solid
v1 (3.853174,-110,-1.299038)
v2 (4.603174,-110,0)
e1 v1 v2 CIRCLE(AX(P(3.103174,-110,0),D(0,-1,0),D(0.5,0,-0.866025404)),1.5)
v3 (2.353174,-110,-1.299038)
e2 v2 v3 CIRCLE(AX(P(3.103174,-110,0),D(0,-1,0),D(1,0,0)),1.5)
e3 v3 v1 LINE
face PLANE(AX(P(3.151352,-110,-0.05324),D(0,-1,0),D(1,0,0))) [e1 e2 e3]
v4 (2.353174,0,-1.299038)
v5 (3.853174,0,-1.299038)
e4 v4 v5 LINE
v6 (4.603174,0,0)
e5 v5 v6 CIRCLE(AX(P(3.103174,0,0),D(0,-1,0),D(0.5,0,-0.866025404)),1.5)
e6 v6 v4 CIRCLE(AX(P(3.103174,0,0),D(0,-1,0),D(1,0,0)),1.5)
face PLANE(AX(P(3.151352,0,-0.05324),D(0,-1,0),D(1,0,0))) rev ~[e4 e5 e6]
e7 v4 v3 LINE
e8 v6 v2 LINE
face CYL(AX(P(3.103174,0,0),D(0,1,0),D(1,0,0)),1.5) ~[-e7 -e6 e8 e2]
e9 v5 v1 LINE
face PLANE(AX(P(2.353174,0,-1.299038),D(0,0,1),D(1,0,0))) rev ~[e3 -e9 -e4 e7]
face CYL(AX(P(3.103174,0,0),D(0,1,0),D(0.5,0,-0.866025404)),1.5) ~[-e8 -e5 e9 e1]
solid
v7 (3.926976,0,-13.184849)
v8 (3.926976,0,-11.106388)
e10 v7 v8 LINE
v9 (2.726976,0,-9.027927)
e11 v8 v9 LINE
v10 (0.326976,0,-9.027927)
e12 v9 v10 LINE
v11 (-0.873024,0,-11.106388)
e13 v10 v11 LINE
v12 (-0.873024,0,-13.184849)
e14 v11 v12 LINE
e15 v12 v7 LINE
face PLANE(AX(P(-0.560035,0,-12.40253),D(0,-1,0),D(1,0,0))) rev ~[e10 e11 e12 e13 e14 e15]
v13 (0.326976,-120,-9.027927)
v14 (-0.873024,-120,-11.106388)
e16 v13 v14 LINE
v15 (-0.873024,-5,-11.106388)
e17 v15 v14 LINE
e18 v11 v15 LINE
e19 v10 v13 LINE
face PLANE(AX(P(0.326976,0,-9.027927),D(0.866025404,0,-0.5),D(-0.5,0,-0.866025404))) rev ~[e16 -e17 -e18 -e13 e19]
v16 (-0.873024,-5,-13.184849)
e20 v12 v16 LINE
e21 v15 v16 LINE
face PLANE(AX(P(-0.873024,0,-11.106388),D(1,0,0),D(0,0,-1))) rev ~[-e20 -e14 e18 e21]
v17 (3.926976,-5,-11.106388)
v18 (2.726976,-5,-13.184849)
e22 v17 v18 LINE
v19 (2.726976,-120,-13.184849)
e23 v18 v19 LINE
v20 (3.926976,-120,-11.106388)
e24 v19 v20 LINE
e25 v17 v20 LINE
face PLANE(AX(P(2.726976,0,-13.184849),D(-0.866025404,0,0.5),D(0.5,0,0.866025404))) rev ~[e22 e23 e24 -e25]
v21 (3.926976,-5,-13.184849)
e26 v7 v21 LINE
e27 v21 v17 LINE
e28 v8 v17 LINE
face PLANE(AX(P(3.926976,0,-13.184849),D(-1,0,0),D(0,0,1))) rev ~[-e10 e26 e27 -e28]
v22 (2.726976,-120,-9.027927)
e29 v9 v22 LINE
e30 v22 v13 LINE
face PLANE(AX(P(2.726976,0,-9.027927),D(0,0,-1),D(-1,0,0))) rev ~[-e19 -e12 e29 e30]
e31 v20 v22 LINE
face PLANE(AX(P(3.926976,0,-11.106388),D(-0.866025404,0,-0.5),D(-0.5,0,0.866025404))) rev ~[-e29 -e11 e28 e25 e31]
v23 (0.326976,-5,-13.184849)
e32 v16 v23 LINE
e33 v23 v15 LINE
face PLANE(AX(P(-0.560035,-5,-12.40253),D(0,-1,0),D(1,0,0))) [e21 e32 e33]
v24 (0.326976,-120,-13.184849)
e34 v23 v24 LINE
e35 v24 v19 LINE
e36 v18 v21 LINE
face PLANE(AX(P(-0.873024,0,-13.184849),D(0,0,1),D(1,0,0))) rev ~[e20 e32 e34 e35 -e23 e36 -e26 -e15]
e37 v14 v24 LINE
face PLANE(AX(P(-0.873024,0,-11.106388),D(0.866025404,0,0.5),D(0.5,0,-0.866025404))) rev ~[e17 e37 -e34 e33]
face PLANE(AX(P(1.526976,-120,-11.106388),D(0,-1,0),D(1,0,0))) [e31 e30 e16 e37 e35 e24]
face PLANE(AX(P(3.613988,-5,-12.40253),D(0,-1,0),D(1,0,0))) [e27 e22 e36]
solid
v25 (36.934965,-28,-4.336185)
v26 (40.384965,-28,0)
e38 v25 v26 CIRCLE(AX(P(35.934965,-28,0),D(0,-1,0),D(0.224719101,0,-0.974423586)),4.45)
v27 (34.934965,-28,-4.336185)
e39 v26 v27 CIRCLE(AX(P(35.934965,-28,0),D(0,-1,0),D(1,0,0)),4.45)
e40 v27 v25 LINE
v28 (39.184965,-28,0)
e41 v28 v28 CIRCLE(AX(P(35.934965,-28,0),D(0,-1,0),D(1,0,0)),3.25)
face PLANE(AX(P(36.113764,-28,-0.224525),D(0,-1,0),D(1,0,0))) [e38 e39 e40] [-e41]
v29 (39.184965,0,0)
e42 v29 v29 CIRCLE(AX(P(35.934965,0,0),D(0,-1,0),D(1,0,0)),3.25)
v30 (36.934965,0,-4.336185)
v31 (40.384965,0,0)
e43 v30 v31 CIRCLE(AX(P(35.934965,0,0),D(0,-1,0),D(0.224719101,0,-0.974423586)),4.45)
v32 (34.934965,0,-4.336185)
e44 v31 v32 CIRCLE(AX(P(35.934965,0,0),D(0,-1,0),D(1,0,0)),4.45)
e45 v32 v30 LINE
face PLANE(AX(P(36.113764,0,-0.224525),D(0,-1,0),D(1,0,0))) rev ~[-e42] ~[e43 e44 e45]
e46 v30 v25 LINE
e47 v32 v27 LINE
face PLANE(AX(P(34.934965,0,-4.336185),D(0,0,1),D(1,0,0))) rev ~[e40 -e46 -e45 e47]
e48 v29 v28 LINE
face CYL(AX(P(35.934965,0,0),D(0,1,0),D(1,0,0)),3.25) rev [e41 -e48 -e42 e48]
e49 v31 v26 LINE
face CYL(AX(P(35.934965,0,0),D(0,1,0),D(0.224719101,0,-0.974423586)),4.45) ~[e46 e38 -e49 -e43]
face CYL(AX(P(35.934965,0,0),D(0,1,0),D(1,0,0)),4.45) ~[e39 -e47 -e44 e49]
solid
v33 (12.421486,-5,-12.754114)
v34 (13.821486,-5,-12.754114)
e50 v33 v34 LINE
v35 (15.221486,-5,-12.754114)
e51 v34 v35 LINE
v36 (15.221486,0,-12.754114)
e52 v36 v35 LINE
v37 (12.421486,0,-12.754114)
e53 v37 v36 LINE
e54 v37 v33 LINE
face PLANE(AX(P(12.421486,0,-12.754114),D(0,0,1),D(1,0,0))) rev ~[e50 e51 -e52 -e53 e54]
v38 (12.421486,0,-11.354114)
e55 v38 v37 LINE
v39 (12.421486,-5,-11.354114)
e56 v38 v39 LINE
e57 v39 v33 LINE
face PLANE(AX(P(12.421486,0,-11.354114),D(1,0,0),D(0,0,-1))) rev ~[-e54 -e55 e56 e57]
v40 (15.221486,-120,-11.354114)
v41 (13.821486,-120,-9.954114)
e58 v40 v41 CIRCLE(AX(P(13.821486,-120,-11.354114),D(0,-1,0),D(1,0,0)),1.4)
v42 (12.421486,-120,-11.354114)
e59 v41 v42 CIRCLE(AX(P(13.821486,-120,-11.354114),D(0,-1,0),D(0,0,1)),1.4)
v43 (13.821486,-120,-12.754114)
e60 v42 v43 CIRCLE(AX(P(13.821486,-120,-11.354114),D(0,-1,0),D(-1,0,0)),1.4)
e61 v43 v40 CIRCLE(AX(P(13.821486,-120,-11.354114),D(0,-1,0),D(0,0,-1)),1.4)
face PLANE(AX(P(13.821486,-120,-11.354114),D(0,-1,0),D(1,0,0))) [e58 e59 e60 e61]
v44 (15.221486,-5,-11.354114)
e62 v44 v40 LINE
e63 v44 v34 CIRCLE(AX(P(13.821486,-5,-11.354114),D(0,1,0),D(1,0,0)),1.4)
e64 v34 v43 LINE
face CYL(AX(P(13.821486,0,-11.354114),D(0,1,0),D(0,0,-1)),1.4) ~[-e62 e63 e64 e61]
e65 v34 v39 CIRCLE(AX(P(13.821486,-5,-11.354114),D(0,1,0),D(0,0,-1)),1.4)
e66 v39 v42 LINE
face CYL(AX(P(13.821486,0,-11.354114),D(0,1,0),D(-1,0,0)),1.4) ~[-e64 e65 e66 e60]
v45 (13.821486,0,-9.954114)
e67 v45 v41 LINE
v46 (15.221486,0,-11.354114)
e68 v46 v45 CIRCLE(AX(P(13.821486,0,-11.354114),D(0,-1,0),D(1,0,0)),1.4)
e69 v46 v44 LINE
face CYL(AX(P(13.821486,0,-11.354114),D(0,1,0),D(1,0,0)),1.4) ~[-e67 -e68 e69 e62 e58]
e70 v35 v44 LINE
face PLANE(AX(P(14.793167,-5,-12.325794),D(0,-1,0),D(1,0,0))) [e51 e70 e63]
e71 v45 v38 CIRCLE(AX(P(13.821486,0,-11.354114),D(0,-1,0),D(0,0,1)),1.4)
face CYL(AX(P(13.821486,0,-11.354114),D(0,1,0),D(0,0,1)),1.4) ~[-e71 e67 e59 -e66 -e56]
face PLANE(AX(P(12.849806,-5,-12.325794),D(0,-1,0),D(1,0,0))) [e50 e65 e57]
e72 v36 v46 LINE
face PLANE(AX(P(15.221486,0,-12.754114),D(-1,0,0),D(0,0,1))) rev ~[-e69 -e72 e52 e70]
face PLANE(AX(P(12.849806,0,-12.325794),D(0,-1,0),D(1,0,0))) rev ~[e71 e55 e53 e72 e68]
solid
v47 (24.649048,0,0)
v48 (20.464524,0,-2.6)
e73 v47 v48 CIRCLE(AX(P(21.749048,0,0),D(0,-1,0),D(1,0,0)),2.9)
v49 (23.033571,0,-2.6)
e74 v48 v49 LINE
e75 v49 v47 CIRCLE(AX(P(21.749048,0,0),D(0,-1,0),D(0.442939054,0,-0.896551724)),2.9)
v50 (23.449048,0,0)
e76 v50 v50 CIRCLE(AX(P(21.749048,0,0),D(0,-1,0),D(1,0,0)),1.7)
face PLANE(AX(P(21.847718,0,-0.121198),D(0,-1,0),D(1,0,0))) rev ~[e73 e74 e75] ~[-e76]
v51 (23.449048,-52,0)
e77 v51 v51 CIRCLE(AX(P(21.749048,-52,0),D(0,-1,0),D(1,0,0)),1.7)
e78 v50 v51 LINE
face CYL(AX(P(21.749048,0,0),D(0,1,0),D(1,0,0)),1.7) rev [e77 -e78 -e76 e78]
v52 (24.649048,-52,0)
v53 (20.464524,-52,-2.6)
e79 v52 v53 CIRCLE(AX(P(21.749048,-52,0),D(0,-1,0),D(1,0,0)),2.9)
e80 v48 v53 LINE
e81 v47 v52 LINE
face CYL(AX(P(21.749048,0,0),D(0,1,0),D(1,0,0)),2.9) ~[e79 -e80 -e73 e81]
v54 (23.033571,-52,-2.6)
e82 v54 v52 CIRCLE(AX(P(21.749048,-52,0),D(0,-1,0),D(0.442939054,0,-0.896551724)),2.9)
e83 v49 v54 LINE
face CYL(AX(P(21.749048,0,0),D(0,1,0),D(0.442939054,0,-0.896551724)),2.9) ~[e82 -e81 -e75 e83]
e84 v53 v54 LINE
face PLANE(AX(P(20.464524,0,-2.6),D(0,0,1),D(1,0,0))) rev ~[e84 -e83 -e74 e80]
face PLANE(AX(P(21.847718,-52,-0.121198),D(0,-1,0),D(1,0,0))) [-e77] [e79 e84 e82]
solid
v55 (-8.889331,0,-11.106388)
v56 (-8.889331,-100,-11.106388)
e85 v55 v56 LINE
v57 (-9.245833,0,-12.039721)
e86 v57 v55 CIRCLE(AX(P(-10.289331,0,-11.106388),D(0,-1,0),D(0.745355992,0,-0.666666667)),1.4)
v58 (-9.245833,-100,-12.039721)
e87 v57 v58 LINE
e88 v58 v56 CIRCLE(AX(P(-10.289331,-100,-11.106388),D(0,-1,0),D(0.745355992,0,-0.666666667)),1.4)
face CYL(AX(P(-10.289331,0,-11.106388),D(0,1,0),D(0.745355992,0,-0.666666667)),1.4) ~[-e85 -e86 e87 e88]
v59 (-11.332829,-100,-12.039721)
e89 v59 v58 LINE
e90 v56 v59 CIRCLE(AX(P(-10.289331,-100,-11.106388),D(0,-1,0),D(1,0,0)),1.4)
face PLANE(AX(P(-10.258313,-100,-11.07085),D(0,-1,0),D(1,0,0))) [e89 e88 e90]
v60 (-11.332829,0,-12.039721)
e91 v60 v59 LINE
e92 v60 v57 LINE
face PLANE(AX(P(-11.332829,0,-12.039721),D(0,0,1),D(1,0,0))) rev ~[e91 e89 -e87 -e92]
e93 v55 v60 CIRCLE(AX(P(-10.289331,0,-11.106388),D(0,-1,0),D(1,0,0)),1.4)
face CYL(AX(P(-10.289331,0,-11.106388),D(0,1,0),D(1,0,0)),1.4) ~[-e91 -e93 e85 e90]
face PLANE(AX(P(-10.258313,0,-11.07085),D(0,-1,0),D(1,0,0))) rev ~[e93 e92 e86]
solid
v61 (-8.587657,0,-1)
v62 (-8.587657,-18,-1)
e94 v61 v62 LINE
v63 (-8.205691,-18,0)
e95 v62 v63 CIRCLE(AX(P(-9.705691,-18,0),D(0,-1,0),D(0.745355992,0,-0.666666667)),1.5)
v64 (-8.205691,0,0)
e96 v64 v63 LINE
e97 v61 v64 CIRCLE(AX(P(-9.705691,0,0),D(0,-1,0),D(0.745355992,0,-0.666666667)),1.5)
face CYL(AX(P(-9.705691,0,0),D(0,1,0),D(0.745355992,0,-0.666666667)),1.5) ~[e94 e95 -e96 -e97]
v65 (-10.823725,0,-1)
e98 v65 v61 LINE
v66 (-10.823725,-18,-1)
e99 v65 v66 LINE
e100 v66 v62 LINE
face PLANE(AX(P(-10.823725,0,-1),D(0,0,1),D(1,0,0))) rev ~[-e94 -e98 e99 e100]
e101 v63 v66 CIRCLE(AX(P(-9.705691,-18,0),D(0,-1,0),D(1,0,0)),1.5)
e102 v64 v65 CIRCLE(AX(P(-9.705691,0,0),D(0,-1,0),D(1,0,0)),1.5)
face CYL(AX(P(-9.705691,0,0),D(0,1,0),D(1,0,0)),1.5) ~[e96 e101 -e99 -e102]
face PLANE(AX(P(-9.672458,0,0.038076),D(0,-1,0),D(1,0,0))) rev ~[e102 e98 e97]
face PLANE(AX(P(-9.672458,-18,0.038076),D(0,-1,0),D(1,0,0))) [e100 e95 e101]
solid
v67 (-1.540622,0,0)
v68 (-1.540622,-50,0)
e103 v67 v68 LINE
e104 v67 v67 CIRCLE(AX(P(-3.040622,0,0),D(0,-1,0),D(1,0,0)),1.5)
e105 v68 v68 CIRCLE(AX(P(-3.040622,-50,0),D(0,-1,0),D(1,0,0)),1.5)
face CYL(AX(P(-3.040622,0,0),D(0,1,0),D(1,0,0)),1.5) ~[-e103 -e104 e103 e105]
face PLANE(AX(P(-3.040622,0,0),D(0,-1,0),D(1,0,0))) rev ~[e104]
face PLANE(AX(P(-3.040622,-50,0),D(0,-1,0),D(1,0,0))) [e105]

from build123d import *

# Parameters (mm, degrees)
F1_DEPTH = 18
F0_R     = 1.5
F2_DEPTH = 50
F3_DEPTH = 110
F4_DEPTH = 100
F0_R_2   = 1.7
F5_DEPTH = 52
F0_R_3   = 3.25
F6_DEPTH = 28
F7_DEPTH = 120
F8_DEPTH = 5
F9_DEPTH = 5


# Not quite as in the source:
# - a feature names something its author has since deleted; it is built from what else it names


with BuildPart() as f1:
    # F0 (on Front) → F1 (new body)
    with BuildSketch(Plane.XZ):
        with BuildLine():
            ThreePointArc((-8.5876567433, -1), (-8.3044321936, -0.5352331347), (-8.205690732, 0))
            ThreePointArc((-8.205690732, 0), (-10.2409238667, 1.4012585384), (-10.8237247208, -1))
            Line((-10.8237247208, -1), (-8.5876567433, -1))
        make_face()
    extrude(amount=F1_DEPTH)


with BuildPart() as f2:
    # F0 (on Front) → F2 (new body)
    with BuildSketch(Plane.XZ):
        with Locations((-3.0406215228, 0)):
            Circle(F0_R)
    extrude(amount=F2_DEPTH)


with BuildPart() as f3:
    # F0 (on Front) → F3 (new body)
    with BuildSketch(Plane.XZ):
        with BuildLine():
            ThreePointArc((4.6031738035, 0), (2.3531738035, 1.2990381057), (2.3531738035, -1.2990381057))
            Line((2.3531738035, -1.2990381057), (3.8531738035, -1.2990381057))
            ThreePointArc((3.8531738035, -1.2990381057), (4.4022119092, -0.75), (4.6031738035, 0))
        make_face()
    extrude(amount=F3_DEPTH)


with BuildPart() as f4:
    # F0 (on Front) → F4 (new body)
    with BuildSketch(Plane.XZ):
        with BuildLine():
            ThreePointArc((-9.2458325086, -12.0397212359), (-8.9814895955, -11.6059388283), (-8.8893308981, -11.1063879026))
            ThreePointArc((-8.8893308981, -11.1063879026), (-10.7888818238, -9.7985466), (-11.3328292876, -12.0397212359))
            Line((-11.3328292876, -12.0397212359), (-9.2458325086, -12.0397212359))
        make_face()
    extrude(amount=F4_DEPTH)


with BuildPart() as f5:
    # F0 (on Front) → F5 (new body)
    with BuildSketch(Plane.XZ):
        with BuildLine():
            ThreePointArc((23.0335708203, -2.6), (24.2122890699, -1.5305036021), (24.6490475625, 0))
            ThreePointArc((24.6490475625, 0), (20.2185439604, 2.4632415074), (20.4645243046, -2.6))
            Line((20.4645243046, -2.6), (23.0335708203, -2.6))
        make_face()
        with Locations((21.7490475625, 0)):
            Circle(F0_R_2, mode=Mode.SUBTRACT)
    extrude(amount=F5_DEPTH)


with BuildPart() as f6:
    # F0 (on Front) → F6 (new body)
    with BuildSketch(Plane.XZ):
        with BuildLine():
            ThreePointArc((36.9349649165, -4.3361849592), (39.4172414707, -2.7706046272), (40.3849649165, 0))
            ThreePointArc((40.3849649165, 0), (33.1643602893, 3.4822765542), (34.9349649165, -4.3361849592))
            Line((34.9349649165, -4.3361849592), (36.9349649165, -4.3361849592))
        make_face()
        with Locations((35.9349649165, 0)):
            Circle(F0_R_3, mode=Mode.SUBTRACT)
    extrude(amount=F6_DEPTH)


with BuildPart() as f7:
    # F0 (on Front) → F7 (new body)
    with BuildSketch(Plane.XZ):
        with BuildLine():
            ThreePointArc((13.8214863837, -12.754113929), (14.8114358773, -12.3440634226), (15.2214863837, -11.354113929))
            ThreePointArc((15.2214863837, -11.354113929), (14.8114358773, -10.3641644353), (13.8214863837, -9.954113929))
            ThreePointArc((13.8214863837, -9.954113929), (12.83153689, -10.3641644353), (12.4214863837, -11.354113929))
            ThreePointArc((12.4214863837, -11.354113929), (12.83153689, -12.3440634226), (13.8214863837, -12.754113929))
        make_face()
    extrude(amount=F7_DEPTH)

    # F0 (on Front) → F9 (join)
    with BuildSketch(Plane.XZ):
        with BuildLine():
            Line((12.4214863837, -12.754113929), (13.8214863837, -12.754113929))
            ThreePointArc((13.8214863837, -12.754113929), (12.83153689, -12.3440634226), (12.4214863837, -11.354113929))
            Line((12.4214863837, -11.354113929), (12.4214863837, -12.754113929))
        make_face()
        with BuildLine():
            Line((15.2214863837, -12.754113929), (15.2214863837, -11.354113929))
            ThreePointArc((15.2214863837, -11.354113929), (14.8114358773, -12.3440634226), (13.8214863837, -12.754113929))
            Line((13.8214863837, -12.754113929), (15.2214863837, -12.754113929))
        make_face()
    extrude(amount=F9_DEPTH)


with BuildPart() as f7b:
    # F0 (on Front) → F7, piece 2 (new body)
    with BuildSketch(Plane.XZ):
        Polygon((2.7269763106, -13.1848488717), (3.9269763106, -11.1063879026), (2.7269763106, -9.0279269335), (0.3269763106, -9.0279269335), (-0.8730236894, -11.1063879026), (0.3269763106, -13.1848488717), align=None)
    extrude(amount=F7_DEPTH)

    # F0 (on Front) → F8 (join)
    with BuildSketch(Plane.XZ):
        with BuildLine():
            Line((-0.8730236894, -13.1848488717), (0.3269763106, -13.1848488717))
            ThreePointArc((0.3269763106, -13.1848488717), (-0.5514846585, -12.3063879026), (-0.8730236894, -11.1063879026))
            Line((-0.8730236894, -11.1063879026), (-0.8730236894, -13.1848488717))
        make_face()
        with BuildLine():
            Line((3.9269763106, -13.1848488717), (3.9269763106, -11.1063879026))
            ThreePointArc((3.9269763106, -11.1063879026), (3.6054372797, -12.3063879026), (2.7269763106, -13.1848488717))
            Line((2.7269763106, -13.1848488717), (3.9269763106, -13.1848488717))
        make_face()
        with BuildLine():
            ThreePointArc((2.7269763106, -13.1848488717), (3.6054372797, -12.3063879026), (3.9269763106, -11.1063879026))
            Line((3.9269763106, -11.1063879026), (2.7269763106, -13.1848488717))
        make_face()
        with BuildLine():
            ThreePointArc((-0.8730236894, -11.1063879026), (-0.5514846585, -12.3063879026), (0.3269763106, -13.1848488717))
            Line((0.3269763106, -13.1848488717), (-0.8730236894, -11.1063879026))
        make_face()
    extrude(amount=F8_DEPTH)


solid = Compound([f1.part, f2.part, f3.part, f4.part, f5.part, f6.part, f7.part, f7b.part])
